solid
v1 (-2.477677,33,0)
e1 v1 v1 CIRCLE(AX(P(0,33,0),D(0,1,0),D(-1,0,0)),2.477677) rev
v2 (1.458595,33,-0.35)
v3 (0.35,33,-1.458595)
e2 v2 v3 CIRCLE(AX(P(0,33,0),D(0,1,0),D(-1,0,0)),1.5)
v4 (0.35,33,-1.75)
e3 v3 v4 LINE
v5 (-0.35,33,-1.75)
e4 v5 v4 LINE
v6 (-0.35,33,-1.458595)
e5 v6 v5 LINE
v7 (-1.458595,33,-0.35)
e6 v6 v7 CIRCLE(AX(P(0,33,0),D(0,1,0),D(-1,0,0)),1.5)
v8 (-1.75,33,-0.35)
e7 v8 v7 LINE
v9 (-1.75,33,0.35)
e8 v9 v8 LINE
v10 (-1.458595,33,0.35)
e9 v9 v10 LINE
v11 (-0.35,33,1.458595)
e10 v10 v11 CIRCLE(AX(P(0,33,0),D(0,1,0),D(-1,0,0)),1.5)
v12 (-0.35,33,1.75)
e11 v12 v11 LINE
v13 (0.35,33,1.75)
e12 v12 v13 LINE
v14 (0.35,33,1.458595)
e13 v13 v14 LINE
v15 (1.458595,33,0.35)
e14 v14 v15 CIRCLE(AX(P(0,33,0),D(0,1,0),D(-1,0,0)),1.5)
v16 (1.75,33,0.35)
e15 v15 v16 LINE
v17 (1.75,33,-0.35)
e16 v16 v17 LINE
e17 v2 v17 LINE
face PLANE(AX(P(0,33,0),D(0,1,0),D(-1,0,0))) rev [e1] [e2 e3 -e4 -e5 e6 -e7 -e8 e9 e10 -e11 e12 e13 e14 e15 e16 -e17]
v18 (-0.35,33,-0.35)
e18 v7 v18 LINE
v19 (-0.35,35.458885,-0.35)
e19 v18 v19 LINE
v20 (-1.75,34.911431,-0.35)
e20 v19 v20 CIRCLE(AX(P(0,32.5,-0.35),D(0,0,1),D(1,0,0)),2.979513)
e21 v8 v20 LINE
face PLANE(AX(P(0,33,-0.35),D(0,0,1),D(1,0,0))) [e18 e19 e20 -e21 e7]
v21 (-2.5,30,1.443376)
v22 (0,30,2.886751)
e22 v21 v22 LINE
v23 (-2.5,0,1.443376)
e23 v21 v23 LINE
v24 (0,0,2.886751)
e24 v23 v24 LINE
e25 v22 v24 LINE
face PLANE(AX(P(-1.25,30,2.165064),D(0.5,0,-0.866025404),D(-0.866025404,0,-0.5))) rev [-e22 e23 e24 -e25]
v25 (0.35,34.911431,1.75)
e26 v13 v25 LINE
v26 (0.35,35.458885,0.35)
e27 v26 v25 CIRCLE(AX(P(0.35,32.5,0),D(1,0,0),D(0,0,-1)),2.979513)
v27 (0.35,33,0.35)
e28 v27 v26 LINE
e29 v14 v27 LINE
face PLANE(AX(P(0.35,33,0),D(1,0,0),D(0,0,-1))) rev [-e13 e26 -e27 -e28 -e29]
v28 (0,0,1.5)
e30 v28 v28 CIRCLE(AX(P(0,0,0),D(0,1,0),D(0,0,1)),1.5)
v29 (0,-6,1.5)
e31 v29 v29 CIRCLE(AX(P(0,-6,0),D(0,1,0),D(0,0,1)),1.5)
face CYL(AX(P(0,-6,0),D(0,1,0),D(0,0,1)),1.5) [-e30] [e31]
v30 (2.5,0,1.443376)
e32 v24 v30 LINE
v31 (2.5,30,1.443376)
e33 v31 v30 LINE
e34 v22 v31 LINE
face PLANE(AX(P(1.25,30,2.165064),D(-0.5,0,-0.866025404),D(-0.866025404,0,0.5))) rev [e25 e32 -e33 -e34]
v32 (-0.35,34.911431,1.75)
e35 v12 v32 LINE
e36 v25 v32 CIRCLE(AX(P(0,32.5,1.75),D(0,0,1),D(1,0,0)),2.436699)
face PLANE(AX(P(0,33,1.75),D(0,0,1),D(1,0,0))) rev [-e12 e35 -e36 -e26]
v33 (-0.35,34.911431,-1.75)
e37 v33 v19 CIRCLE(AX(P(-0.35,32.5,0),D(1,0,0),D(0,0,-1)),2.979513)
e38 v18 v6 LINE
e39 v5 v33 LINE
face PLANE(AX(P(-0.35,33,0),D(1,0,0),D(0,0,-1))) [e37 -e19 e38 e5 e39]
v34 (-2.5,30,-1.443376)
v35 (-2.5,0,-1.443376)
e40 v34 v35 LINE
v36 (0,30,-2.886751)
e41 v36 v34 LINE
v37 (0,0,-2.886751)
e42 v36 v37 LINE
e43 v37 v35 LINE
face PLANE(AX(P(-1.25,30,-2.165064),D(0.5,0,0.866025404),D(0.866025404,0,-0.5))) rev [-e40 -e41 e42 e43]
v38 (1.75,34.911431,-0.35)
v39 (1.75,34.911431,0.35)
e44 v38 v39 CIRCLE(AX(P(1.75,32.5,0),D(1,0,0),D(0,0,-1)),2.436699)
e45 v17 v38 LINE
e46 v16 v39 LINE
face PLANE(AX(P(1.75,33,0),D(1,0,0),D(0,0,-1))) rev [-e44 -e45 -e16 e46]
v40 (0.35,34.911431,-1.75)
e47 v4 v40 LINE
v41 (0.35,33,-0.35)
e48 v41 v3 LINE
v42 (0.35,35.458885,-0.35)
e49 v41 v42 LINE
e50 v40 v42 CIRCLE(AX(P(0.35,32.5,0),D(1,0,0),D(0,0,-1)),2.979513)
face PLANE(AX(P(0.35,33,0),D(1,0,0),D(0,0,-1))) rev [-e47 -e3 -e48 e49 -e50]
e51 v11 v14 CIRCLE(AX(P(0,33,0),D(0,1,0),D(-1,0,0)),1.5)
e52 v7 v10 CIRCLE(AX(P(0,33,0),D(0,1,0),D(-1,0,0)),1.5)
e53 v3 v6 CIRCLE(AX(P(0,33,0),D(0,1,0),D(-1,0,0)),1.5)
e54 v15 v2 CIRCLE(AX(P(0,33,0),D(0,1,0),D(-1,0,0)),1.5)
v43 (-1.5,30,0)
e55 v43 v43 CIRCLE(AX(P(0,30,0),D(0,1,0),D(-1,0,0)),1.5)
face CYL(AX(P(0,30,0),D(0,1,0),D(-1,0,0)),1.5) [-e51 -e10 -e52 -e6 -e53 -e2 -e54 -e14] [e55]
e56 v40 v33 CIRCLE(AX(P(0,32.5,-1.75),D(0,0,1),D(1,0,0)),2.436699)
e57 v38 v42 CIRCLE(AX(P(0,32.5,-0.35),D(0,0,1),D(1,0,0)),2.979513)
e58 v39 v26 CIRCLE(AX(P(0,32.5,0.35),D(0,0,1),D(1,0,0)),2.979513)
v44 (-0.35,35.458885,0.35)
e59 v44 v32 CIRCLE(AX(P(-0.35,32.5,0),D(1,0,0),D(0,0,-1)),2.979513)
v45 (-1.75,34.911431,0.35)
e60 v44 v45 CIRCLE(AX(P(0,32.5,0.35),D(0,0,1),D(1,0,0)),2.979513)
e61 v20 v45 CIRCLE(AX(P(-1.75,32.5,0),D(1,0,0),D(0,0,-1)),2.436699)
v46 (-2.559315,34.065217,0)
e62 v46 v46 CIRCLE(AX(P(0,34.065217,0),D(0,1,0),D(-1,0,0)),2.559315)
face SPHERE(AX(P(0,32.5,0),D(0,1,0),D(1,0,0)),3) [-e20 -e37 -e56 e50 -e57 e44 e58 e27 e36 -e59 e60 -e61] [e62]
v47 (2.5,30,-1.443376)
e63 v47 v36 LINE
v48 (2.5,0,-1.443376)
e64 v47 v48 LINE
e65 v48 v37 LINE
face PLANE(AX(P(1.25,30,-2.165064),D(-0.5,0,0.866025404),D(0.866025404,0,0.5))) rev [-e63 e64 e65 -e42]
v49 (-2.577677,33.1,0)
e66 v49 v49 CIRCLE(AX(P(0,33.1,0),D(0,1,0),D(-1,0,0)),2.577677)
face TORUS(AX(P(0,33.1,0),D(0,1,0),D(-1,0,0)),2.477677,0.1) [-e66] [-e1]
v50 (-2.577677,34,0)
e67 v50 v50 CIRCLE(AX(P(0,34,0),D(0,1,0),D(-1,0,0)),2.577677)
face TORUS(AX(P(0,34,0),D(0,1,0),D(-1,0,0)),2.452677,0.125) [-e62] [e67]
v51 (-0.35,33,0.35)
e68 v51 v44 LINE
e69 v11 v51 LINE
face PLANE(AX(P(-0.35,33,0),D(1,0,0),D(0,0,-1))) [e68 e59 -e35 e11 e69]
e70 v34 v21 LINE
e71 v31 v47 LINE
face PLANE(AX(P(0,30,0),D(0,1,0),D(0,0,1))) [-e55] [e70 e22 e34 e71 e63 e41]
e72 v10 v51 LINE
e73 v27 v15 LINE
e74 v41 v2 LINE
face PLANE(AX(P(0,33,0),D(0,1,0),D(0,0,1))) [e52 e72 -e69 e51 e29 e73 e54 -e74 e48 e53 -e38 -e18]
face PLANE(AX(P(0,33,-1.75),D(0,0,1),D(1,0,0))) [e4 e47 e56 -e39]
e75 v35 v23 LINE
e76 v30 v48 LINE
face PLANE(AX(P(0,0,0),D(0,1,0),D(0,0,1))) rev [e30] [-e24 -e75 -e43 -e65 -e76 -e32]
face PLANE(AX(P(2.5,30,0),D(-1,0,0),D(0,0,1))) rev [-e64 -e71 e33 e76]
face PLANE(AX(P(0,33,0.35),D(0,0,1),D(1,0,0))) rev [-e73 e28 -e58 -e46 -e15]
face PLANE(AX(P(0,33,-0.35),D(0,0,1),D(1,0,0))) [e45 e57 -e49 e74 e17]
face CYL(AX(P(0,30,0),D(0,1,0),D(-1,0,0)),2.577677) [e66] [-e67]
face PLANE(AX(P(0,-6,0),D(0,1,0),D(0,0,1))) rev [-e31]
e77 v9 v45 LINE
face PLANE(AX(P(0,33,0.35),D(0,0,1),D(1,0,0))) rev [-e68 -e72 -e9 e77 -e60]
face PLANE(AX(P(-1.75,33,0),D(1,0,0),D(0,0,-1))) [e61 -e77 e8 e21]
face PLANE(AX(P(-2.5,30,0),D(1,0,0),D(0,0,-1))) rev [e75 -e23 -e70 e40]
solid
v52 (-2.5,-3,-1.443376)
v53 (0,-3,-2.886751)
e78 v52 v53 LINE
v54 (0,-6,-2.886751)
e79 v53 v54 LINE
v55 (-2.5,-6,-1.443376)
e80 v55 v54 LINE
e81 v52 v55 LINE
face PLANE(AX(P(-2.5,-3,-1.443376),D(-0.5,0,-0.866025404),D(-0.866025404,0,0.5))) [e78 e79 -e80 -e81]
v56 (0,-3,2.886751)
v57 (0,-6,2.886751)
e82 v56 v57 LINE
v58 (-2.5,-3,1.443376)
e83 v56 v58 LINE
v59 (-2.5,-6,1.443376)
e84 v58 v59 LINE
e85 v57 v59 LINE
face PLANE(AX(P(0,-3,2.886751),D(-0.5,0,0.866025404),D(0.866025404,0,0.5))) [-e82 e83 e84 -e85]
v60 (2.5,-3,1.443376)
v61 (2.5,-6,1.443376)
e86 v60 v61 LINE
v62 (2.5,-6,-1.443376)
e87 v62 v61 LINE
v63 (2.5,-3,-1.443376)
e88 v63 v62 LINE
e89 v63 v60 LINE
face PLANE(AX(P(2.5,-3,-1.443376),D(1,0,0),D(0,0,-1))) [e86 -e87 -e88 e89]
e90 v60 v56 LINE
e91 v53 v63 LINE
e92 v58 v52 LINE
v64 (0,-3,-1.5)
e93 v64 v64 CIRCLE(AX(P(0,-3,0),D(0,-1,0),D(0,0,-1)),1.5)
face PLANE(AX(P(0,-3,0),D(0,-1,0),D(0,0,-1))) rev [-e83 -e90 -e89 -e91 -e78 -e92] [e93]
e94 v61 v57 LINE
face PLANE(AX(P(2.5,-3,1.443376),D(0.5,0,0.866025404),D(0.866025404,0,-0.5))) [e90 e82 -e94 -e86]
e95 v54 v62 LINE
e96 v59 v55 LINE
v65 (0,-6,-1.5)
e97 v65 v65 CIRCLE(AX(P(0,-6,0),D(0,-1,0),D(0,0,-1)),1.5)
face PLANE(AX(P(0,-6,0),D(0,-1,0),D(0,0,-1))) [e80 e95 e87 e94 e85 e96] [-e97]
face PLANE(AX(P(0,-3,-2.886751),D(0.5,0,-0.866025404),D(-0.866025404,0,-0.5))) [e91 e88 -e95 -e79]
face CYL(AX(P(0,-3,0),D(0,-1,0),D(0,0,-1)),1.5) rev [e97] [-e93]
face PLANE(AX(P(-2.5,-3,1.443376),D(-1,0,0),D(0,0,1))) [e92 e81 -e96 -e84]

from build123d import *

# Parameters (mm, degrees)
BOSS_EXTRUDE1_DEPTH = 30
SKETCH1_4_R         = 1.5
BOSS_EXTRUDE2_DEPTH = 6
CUT_EXTRUDE1_DEPTH  = 7
FILLET1_R           = 0.1
SKETCH5_R           = 1.5
BOSS_EXTRUDE3_DEPTH = 3


with BuildPart() as part:
    # Sketch1 → Boss-Extrude1 (new body)
    with BuildSketch(Plane(origin=(0, 0, 0), x_dir=(1, 0, 0), z_dir=(0, 1, 0))):
        Polygon((2.5, -1.443375673), (2.5, 1.443375673), (0, 2.886751346), (-2.5, 1.443375673), (-2.5, -1.443375673), (0, -2.886751346), align=None)
    extrude(amount=BOSS_EXTRUDE1_DEPTH)

    # Sketch1<4> → Boss-Extrude2 (add)
    with BuildSketch(Plane(origin=(0, 0, 0), x_dir=(1, 0, 0), z_dir=(0, 1, 0))):
        Circle(SKETCH1_4_R)
    extrude(amount=-BOSS_EXTRUDE2_DEPTH)

    # Sketch3 → Revolve1 (revolve)
    with BuildSketch(Plane.XY):
        with BuildLine():
            Line((0, 30), (1.5, 30))
            Line((1.5, 30), (1.5, 33))
            Line((1.5, 33), (2.577677109, 33))
            Line((2.577677109, 33), (2.577677109, 34))
            ThreePointArc((2.577677109, 34), (2.572999109, 34.033876486), (2.559315248, 34.065217384))
            ThreePointArc((2.559315248, 34.065217384), (1.467028944, 35.116835126), (0, 35.5))
            Line((0, 35.5), (0, 30))
        make_face()
    revolve(axis=Axis((0, 30, 0), (0, -1, 0)))

    # Sketch4 → Cut-Extrude1 (cut)
    with BuildSketch(Plane(origin=(0, 40, 0), x_dir=(1, 0, 0), z_dir=(0, 1, 0))):
        Polygon((-1.75, 0.35), (-1.75, -0.35), (-0.35, -0.35), (-0.35, -1.75), (0.35, -1.75), (0.35, -0.35), (1.75, -0.35), (1.75, 0.35), (0.35, 0.35), (0.35, 1.75), (-0.35, 1.75), (-0.35, 0.35), align=None)
    extrude(amount=-CUT_EXTRUDE1_DEPTH, mode=Mode.SUBTRACT)

    # Fillet1
    fillet1_edges = [part.edges().sort_by_distance(p)[0] for p in [
        (-2.577677109, 33, 0),
    ]]
    fillet(fillet1_edges, radius=FILLET1_R)


with BuildPart() as body_2:
    # Sketch5 → Boss-Extrude3 (new body)
    with BuildSketch(Plane.XZ.offset(6)):
        Polygon((2.5, 1.443375673), (0, 2.886751346), (-2.5, 1.443375673), (-2.5, -1.443375673), (0, -2.886751346), (2.5, -1.443375673), align=None)
        Circle(SKETCH5_R, mode=Mode.SUBTRACT)
    extrude(amount=-BOSS_EXTRUDE3_DEPTH)


solid = Compound([part.part, body_2.part])
